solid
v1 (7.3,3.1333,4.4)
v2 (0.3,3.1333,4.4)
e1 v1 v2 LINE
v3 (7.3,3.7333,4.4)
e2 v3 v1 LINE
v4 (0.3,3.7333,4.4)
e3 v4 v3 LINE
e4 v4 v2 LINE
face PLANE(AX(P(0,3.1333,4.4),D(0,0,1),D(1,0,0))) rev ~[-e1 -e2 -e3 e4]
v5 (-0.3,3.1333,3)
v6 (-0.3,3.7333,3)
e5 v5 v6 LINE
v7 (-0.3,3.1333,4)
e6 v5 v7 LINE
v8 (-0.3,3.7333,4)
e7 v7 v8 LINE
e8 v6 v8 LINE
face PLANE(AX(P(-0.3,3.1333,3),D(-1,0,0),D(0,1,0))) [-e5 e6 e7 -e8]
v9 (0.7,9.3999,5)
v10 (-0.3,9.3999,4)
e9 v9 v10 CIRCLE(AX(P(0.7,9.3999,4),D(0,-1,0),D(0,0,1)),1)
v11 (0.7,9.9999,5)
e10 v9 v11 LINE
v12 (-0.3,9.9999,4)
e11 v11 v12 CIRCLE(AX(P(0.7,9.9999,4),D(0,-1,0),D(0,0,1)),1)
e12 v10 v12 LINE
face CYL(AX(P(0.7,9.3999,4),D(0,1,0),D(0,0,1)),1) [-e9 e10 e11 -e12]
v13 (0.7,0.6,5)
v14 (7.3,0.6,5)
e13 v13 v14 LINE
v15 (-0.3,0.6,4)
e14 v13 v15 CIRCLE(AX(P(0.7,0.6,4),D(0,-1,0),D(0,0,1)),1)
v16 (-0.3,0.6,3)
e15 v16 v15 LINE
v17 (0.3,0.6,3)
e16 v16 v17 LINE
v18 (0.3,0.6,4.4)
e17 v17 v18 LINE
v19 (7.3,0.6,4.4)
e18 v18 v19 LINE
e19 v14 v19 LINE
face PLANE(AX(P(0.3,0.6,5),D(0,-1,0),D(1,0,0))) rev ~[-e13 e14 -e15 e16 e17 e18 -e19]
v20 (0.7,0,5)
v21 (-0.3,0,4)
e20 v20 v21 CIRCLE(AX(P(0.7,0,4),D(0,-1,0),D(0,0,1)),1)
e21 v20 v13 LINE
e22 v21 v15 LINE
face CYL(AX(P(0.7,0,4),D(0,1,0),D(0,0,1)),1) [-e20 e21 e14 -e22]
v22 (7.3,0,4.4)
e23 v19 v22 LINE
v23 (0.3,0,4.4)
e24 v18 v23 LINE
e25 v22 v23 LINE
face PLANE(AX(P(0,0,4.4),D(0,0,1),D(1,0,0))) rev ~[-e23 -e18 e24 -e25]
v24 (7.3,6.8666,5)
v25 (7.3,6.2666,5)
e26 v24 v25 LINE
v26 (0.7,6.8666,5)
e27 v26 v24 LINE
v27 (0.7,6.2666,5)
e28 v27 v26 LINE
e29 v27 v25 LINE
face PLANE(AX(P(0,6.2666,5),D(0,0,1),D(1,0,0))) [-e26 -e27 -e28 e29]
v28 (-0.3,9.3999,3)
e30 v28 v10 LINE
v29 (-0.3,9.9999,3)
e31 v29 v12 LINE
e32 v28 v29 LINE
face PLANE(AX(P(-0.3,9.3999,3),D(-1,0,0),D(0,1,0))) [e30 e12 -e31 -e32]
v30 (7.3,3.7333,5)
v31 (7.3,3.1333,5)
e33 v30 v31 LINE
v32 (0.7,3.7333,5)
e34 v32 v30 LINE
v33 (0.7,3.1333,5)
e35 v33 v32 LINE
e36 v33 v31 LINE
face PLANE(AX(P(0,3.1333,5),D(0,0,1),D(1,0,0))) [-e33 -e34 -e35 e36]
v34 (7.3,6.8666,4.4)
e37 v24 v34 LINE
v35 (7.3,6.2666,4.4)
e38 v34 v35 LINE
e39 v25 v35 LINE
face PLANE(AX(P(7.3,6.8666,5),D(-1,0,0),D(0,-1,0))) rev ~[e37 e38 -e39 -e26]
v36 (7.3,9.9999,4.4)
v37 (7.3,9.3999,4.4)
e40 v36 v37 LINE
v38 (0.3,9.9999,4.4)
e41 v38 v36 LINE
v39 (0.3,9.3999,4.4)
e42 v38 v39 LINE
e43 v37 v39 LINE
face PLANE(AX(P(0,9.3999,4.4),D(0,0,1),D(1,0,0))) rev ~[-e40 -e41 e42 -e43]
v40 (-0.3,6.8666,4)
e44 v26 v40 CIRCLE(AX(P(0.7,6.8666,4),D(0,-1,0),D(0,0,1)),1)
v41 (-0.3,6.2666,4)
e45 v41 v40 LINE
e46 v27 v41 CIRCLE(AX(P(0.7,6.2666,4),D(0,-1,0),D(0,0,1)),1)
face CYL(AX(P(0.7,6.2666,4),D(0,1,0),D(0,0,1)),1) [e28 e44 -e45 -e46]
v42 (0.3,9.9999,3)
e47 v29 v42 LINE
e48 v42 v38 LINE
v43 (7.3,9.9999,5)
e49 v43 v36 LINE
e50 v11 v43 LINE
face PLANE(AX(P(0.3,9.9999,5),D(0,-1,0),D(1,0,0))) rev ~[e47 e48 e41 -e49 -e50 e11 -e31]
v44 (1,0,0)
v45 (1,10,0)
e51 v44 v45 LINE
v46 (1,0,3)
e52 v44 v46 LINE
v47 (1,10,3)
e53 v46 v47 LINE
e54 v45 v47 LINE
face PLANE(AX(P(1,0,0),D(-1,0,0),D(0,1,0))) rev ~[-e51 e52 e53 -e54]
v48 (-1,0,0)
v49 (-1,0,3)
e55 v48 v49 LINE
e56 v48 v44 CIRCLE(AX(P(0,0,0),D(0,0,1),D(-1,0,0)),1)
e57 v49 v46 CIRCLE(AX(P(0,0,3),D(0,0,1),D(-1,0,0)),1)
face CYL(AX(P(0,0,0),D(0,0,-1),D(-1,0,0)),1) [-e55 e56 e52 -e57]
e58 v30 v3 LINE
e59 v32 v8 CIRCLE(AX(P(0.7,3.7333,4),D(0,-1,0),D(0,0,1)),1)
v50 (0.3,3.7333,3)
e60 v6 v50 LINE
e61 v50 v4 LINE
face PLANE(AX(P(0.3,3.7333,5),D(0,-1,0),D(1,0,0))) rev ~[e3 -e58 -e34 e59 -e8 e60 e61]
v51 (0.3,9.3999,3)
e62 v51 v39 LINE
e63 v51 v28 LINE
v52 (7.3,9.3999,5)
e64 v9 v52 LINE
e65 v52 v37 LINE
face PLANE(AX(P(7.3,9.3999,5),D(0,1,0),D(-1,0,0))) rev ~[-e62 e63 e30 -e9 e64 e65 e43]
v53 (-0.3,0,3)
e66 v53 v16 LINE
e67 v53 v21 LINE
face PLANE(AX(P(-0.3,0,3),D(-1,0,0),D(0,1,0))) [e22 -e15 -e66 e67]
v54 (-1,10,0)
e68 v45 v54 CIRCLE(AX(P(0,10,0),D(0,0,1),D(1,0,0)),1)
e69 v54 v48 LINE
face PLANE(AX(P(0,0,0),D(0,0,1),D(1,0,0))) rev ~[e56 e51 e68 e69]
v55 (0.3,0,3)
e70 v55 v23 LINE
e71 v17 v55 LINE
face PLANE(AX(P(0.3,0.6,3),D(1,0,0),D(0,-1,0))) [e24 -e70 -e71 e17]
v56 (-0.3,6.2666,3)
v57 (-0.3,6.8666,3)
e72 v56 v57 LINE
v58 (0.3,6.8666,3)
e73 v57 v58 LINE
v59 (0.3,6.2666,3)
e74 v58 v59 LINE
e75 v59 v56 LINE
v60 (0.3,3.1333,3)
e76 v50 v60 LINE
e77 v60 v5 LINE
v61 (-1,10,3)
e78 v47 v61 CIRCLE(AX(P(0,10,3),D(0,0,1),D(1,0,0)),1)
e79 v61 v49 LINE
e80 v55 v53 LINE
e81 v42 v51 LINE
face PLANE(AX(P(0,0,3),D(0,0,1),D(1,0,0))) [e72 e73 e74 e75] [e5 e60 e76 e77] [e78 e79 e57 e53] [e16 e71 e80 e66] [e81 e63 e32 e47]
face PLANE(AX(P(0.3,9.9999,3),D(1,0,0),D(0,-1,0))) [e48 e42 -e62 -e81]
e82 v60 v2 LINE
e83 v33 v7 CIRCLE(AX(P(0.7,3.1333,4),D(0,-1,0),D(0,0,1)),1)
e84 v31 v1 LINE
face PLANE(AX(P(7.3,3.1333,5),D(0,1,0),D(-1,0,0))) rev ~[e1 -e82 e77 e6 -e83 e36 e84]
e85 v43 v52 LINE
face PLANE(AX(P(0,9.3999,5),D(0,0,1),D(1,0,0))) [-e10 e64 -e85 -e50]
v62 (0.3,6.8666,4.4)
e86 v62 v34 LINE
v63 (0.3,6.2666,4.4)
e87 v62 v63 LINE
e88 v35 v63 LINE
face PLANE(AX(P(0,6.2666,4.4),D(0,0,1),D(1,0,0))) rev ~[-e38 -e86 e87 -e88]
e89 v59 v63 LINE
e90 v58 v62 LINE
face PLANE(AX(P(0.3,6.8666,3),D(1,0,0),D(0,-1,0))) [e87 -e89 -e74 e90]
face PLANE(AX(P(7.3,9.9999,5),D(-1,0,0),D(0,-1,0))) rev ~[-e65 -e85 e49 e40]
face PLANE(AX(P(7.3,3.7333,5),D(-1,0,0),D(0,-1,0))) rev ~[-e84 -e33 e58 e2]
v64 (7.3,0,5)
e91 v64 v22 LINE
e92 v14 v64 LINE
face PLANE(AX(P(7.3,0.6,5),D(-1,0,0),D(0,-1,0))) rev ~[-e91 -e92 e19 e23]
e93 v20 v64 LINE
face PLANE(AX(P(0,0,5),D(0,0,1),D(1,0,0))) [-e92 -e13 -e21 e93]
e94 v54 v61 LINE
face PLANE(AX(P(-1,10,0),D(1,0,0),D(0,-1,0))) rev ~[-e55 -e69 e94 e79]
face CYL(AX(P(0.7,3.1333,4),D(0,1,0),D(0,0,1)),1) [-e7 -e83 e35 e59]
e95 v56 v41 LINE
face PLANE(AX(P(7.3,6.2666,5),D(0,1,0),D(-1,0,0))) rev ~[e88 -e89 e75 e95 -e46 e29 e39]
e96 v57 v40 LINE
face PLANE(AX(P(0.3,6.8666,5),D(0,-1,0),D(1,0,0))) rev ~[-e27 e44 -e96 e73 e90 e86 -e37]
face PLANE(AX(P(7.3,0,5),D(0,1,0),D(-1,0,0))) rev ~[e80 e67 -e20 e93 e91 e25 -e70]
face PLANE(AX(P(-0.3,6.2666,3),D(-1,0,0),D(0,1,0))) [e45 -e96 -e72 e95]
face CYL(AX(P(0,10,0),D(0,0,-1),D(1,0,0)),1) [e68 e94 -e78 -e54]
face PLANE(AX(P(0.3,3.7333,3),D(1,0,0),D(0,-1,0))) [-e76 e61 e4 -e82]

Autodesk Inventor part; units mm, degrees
ref_plane "YZ Plane" through (0, 0, 0) normal (1, 0, 0) x (0, 1, 0)
ref_plane "XZ Plane" through (0, 0, 0) normal (0, 1, 0) x (-1, 0, 0)
ref_plane "XY Plane" through (0, 0, 0) normal (0, 0, 1) x (1, 0, 0)
sketch "Esboço1" plane through (0, 0, 0) normal (0, 0, 1) x (1, 0, 0)
  line L0 (0, 0) -> (0, 10) construction
  line L1 (1, 0) -> (1, 10)
  line L2 (-1, 10) -> (-1, 0)
  arc A0 (-1, 0) -> (1, 0) centre (0, 0) ccw
  arc A1 (1, 10) -> (-1, 10) centre (0, 10) ccw
  point P0 (0, 5)
  dimension "d0" = 10
  dimension "d1" = 2
extrude "Extrusão1" add sketch "Esboço1" along normal blind 3
sketch "Esboço2" plane through (0, 0, 3) normal (0, 0, 1) x (1, 0, 0)
  arc A0 (1, 10) -> (-1, 10) centre (0, 10) ccw construction
  arc A1 (-1, 0) -> (1, 0) centre (0, 0) ccw construction
  line L0 (0, 10) -> (0, 0) construction
  line L1 (-1, 10) -> (-1, 0) construction
  line L2 (-1, 0) -> (1, 0) construction
  line L3 (0.3, 0) -> (-0.3, 0)
  line L4 (-0.3, 0) -> (-0.3, 0.6)
  line L5 (-0.3, 0.6) -> (0.3, 0.6)
  line L6 (0.3, 0.6) -> (0.3, 0)
  dimension "d4" = 0.6
  dimension "d5" = 0.6
  dimension "d6" = 0.6
  dimension "d7" = 0.3
extrude "Extrusão2" add sketch "Esboço2" along normal blind 2
sketch "Esboço3" plane through (0, 0, 5) normal (0, 0, 1) x (1, 0, 0)
  line L0 (0.3, 0) -> (-0.3, 0) projected
  line L1 (-0.3, 0.6) -> (0.3, 0.6) projected
  line L2 (0.3, 0.6) -> (0.3, 0)
  line L3 (0.3, 0.6) -> (0.3, 0) projected
  line L4 (0.3, 0.6) -> (7.3, 0.6)
  line L5 (7.3, 0.6) -> (7.3, 0)
  line L6 (7.3, 0) -> (0.3, 0)
  line L7 (0.3, 0) -> (0.3, 0.6)
  point P0 (0, 0)
  dimension "d13" = 7
extrude "Extrusão3" add sketch "Esboço3" against normal blind 0.6
fillet "Arredondamento1" radius 1 1 edges at (-0.3, 0.3, 5)
pattern_linear "Padrão retangular1" count 4 spacing 3.1333 along (0, 1, 0) of "Extrusão3", "Arredondamento1", "Extrusão2"
properties part number "Conector"
